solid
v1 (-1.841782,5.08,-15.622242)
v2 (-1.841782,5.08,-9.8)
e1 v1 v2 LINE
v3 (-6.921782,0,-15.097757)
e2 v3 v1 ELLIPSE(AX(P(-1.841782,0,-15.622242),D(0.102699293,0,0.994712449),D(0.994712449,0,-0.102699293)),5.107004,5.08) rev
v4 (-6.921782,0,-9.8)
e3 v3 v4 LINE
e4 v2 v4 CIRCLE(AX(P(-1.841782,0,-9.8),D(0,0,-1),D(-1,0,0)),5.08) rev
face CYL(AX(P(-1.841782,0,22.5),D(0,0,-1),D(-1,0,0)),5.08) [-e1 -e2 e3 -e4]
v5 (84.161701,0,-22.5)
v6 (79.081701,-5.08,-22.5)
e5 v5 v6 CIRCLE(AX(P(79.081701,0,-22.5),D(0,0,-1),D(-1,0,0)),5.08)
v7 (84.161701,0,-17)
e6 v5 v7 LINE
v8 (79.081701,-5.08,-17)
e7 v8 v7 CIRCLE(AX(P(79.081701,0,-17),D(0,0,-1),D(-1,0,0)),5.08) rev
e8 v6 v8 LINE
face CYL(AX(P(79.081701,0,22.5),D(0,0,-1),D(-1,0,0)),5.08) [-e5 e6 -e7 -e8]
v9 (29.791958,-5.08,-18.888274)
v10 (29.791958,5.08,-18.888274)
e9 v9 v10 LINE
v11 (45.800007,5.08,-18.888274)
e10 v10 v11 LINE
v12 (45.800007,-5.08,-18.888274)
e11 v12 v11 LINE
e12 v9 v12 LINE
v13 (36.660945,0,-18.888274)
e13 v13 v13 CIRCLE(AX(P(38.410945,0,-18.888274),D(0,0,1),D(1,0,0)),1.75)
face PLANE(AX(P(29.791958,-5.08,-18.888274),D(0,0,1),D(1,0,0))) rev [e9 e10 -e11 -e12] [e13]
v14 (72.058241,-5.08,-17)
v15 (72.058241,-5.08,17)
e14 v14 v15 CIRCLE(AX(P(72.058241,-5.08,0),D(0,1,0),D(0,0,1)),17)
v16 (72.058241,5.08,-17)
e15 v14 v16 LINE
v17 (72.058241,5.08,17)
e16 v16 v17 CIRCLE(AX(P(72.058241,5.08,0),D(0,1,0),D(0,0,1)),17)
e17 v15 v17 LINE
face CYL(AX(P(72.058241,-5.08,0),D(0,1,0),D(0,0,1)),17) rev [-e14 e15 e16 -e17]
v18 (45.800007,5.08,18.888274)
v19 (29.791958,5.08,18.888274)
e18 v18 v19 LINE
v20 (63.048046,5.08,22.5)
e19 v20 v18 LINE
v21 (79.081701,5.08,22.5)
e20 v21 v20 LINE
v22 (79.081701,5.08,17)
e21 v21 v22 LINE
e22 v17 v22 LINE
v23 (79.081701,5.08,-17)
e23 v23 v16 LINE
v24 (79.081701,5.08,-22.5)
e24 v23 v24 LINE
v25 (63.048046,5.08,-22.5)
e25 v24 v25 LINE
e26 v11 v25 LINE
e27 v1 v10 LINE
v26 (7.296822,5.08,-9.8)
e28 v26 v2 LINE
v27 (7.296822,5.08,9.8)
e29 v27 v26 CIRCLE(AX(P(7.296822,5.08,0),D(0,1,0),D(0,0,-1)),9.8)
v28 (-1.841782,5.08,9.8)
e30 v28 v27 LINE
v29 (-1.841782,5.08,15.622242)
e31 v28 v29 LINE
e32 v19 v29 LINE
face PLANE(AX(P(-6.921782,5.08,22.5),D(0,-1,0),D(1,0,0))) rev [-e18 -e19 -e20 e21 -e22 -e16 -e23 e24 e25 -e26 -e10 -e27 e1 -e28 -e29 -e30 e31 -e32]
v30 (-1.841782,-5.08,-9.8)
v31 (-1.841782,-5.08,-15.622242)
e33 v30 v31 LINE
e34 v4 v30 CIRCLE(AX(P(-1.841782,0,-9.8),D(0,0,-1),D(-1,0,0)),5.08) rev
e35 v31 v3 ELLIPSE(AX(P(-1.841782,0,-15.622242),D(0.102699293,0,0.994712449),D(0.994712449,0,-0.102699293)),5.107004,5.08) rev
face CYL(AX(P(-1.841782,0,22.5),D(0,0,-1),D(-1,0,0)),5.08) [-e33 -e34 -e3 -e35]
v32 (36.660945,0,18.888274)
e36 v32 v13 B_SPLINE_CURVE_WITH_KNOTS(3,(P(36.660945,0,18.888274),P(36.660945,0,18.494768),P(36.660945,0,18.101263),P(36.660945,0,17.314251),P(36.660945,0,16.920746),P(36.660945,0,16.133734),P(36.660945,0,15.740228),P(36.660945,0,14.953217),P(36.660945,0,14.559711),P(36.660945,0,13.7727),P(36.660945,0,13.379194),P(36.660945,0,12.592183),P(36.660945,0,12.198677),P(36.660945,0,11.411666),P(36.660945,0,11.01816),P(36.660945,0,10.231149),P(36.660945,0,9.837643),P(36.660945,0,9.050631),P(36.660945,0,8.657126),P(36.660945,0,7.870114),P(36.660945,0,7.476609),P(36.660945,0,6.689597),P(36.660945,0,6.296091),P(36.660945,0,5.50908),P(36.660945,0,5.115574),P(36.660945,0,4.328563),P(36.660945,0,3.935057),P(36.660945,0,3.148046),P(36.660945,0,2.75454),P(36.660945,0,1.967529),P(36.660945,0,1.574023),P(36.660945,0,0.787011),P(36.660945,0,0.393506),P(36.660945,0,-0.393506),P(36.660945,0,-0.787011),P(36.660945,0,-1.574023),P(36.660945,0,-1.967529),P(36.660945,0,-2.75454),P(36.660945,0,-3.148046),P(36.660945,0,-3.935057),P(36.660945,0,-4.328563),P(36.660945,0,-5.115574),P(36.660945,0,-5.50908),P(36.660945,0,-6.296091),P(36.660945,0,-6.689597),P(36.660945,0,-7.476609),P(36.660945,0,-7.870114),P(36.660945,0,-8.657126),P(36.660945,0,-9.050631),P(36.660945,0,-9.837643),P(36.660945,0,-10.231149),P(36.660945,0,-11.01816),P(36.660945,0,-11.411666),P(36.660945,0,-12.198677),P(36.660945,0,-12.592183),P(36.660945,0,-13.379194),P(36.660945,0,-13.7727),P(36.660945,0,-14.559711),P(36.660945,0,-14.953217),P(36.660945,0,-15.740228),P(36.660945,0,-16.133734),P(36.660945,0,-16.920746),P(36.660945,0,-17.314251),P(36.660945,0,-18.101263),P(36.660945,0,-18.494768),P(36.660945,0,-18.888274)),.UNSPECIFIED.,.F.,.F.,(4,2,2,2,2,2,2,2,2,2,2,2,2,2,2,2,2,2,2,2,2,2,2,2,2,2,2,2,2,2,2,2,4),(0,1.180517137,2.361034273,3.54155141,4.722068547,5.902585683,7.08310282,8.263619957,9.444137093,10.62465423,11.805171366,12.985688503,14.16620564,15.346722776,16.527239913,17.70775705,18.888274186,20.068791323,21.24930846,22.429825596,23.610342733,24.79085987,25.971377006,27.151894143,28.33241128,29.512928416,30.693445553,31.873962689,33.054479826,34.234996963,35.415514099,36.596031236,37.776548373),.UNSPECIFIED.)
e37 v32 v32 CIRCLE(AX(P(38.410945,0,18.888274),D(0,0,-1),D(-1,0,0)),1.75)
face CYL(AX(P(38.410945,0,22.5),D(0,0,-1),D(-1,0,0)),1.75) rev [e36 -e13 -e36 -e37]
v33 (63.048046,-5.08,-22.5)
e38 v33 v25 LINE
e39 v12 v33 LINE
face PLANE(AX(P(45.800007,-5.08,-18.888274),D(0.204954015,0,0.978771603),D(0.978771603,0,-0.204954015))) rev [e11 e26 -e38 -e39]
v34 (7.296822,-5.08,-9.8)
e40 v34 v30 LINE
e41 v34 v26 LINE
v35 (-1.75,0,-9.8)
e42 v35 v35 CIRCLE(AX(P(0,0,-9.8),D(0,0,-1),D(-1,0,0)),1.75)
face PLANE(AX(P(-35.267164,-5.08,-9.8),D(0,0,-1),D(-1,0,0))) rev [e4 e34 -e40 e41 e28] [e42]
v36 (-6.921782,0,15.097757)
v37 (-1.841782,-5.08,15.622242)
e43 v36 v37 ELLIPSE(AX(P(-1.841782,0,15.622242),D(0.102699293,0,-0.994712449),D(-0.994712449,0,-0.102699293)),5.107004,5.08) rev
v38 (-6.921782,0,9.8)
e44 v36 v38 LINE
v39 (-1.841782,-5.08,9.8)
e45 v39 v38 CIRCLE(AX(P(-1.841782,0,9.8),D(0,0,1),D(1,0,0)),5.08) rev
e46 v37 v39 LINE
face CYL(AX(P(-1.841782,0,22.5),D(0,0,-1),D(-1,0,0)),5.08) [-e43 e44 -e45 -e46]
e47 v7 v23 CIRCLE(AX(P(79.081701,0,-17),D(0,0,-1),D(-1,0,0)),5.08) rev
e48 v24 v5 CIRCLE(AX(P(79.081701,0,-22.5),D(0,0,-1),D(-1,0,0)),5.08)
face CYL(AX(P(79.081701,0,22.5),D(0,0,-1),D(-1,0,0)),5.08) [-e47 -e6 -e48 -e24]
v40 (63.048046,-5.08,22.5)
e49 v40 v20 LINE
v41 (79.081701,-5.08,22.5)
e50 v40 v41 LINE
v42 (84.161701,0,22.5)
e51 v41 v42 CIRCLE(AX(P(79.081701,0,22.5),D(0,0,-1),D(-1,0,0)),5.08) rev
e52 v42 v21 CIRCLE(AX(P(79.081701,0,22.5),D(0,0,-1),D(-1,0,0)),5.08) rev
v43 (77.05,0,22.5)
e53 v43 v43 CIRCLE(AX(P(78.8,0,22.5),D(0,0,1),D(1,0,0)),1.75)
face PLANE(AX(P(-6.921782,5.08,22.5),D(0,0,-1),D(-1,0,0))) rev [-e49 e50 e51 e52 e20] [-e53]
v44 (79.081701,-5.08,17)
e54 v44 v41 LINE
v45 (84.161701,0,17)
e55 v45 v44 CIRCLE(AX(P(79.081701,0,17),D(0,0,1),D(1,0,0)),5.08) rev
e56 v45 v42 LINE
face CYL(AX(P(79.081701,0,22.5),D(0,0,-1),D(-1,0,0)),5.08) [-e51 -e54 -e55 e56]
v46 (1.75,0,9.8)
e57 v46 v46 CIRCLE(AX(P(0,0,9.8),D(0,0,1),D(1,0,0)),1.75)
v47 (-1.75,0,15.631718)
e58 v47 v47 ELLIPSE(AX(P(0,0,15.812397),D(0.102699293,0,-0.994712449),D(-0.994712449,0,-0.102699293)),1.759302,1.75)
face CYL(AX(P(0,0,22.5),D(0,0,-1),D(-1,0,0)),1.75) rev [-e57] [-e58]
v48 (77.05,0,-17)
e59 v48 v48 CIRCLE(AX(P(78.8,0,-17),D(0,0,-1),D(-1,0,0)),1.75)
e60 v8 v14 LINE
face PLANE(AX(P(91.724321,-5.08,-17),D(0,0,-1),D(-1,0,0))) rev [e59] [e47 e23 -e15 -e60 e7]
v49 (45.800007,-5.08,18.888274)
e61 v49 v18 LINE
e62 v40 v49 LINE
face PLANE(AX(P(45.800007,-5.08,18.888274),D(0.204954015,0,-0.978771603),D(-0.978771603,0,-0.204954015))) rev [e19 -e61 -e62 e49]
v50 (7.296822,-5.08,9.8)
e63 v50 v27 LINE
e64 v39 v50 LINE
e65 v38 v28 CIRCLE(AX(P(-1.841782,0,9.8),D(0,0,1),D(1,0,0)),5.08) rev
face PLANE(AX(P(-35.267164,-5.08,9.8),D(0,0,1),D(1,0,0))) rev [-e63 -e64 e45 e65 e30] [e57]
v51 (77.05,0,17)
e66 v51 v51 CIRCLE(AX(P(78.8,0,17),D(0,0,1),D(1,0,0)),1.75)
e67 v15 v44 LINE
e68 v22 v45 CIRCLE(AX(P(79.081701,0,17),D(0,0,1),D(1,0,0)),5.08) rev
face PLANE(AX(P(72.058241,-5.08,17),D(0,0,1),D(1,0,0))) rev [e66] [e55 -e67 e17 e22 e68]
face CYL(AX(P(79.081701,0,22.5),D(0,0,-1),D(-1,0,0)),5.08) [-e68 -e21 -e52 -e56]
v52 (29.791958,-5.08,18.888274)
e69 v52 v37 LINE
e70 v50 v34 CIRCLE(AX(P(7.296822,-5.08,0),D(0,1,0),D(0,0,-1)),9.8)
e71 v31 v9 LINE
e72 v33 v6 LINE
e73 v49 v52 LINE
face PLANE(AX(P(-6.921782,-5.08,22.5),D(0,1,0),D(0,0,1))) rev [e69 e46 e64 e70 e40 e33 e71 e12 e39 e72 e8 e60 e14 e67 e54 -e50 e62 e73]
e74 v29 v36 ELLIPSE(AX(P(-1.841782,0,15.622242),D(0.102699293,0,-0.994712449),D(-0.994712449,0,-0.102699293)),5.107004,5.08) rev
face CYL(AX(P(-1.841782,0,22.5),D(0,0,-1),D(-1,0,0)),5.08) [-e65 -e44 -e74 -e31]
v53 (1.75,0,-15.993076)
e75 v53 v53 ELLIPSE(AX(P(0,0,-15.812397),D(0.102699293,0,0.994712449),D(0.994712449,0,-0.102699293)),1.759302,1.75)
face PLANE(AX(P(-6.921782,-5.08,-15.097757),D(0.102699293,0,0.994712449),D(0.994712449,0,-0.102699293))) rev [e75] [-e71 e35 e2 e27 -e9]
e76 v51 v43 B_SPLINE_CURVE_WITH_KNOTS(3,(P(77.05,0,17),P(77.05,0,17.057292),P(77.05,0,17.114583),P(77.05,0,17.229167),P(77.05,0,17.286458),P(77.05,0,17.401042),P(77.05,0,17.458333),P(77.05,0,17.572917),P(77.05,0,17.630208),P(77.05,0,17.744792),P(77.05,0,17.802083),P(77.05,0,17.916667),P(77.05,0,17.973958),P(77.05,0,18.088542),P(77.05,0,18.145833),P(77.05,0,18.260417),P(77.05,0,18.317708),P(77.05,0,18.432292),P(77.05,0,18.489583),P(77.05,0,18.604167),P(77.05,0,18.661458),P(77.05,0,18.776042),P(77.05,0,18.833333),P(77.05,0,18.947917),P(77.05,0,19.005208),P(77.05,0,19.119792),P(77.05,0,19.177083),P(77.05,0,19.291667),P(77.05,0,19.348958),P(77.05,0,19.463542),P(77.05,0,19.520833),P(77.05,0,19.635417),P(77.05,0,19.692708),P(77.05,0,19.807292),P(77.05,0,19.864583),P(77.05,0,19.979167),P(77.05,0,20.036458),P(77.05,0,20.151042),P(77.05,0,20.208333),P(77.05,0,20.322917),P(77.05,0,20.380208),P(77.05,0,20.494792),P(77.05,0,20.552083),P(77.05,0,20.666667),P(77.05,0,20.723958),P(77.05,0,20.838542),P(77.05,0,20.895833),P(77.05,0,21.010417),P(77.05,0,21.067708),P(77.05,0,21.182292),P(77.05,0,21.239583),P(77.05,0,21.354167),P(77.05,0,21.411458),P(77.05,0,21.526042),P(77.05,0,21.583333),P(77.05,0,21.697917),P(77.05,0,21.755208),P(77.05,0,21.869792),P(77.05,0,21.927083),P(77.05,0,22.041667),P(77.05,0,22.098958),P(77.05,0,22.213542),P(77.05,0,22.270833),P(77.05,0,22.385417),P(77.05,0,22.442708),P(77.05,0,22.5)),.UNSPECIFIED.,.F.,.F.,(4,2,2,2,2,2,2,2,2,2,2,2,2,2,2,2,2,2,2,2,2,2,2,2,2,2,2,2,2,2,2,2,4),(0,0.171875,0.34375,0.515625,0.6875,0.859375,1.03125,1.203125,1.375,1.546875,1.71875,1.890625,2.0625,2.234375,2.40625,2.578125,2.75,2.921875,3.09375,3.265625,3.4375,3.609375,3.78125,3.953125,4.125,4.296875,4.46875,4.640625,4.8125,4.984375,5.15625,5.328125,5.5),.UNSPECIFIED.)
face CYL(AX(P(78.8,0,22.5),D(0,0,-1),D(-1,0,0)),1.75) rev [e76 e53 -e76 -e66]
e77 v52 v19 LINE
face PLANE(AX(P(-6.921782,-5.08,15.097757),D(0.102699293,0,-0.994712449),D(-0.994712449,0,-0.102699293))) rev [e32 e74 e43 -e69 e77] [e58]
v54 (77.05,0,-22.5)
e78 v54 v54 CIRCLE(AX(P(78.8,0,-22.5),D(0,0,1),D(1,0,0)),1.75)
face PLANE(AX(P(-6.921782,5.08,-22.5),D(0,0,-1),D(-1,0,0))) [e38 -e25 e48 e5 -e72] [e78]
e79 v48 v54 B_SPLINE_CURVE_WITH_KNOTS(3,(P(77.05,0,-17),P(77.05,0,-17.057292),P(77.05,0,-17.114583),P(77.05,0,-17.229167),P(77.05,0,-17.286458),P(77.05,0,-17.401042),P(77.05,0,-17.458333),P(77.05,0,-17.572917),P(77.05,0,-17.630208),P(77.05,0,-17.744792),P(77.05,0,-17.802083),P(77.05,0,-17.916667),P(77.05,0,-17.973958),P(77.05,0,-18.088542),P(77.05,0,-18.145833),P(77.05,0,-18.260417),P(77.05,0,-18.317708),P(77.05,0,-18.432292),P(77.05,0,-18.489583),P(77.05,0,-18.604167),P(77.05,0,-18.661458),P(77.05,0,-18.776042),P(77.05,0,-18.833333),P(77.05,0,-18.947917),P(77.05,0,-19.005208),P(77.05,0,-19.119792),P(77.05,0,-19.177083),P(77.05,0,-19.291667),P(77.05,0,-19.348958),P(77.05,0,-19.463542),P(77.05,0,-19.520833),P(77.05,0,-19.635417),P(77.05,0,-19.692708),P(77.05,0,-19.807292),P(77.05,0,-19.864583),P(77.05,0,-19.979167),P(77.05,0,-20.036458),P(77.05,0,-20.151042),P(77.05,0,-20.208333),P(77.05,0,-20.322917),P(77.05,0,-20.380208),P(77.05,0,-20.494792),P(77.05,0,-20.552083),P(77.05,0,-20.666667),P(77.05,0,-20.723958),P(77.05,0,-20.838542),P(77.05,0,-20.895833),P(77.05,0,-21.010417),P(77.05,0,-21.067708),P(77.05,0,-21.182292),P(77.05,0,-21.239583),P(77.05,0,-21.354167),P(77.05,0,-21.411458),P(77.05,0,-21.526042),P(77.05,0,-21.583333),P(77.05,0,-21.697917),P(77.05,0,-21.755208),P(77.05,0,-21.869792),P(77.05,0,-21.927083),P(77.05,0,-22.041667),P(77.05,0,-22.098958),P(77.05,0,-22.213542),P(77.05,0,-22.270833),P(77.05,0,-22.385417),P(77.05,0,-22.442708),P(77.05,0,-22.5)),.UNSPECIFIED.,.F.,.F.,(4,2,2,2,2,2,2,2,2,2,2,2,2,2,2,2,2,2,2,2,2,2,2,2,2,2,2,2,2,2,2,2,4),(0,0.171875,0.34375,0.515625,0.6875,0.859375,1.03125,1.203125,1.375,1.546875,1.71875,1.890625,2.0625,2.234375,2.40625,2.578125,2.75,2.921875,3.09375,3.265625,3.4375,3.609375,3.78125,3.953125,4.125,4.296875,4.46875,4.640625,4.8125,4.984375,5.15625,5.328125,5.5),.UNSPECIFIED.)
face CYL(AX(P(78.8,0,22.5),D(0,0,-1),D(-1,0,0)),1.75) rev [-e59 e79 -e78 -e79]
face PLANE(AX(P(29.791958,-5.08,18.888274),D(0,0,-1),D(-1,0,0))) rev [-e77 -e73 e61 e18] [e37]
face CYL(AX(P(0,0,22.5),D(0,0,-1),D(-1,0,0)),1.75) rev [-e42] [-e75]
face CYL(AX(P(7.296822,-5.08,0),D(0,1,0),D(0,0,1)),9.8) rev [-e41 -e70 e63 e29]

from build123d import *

# Parameters (mm, degrees)
SKETCH2_W           = 91.08348254
SKETCH2_H           = 10.16
SKETCH2_R           = 1.75
BOSS_EXTRUDE1_DEPTH = 22.5
CUT_EXTRUDE1_DEPTH  = 88.707853004
FILLET1_R           = 5.08


with BuildPart() as part:
    # Sketch2 → Boss-Extrude1 (new, symmetric)
    with BuildSketch(Plane.XY):
        with Locations((38.619959512, 0)):
            Rectangle(SKETCH2_W, SKETCH2_H)
        with Locations(Location((38.410945338, 0, 0), (0, 0, 180))):
            Circle(SKETCH2_R, mode=Mode.SUBTRACT)
        with Locations(Location((0, 0, 0), (0, 0, 180))):
            Circle(SKETCH2_R, mode=Mode.SUBTRACT)
        with Locations(Location((78.79999988, 0, 0), (0, 0, 180))):
            Circle(SKETCH2_R, mode=Mode.SUBTRACT)
    extrude(amount=BOSS_EXTRUDE1_DEPTH, both=True)

    # Sketch3 → Cut-Extrude1 (cut, through all)
    with BuildSketch(Plane(origin=(0, 5.08, 0), x_dir=(1, 0, 0), z_dir=(0, 1, 0))):
        with BuildLine():
            Line((91.724321271, 17), (72.05824076, 17))
            ThreePointArc((72.05824076, 17), (55.05824076, 0), (72.05824076, -17))
            Line((72.05824076, -17), (91.724321271, -17))
            Line((91.724321271, -17), (91.724321271, 17))
        make_face()
        Polygon((-6.921781758, 15.097756516), (29.791957943, 18.888274186), (45.800007469, 18.888274186), (63.048045595, 22.5), (63.048045595, 41.563803389), (-6.921781758, 41.563803389), align=None)
        with BuildLine():
            Line((-35.26716372, 9.799999958), (7.296822355, 9.799999958))
            ThreePointArc((7.296822355, 9.799999958), (17.096822313, 0), (7.296822355, -9.799999958))
            Line((7.296822355, -9.799999958), (-35.26716372, -9.799999958))
            Line((-35.26716372, -9.799999958), (-35.26716372, 9.799999958))
        make_face()
        Polygon((63.048045595, -22.5), (63.048045595, -41.563803389), (-6.921781758, -41.563803389), (-6.921781758, -15.097756516), (29.791957943, -18.888274186), (45.800007469, -18.888274186), align=None)
    extrude(amount=-CUT_EXTRUDE1_DEPTH, mode=Mode.SUBTRACT)

    # Fillet1
    fillet1_edges = [part.edges().sort_by_distance(p)[0] for p in [
        (-6.921781758, 5.08, -12.448878237),
        (-6.921781758, -5.08, -12.448878237),
        (-6.921781758, -5.08, 12.448878237),
        (-6.921781758, 5.08, 12.448878237),
        (84.161700782, -5.08, -19.75),
        (84.161700782, -5.08, 19.75),
        (84.161700782, 5.08, 19.75),
        (84.161700782, 5.08, -19.75),
    ]]
    fillet(fillet1_edges, radius=FILLET1_R - 0.0001)  # a hair under: the kernel refuses the full size


solid = part.part
